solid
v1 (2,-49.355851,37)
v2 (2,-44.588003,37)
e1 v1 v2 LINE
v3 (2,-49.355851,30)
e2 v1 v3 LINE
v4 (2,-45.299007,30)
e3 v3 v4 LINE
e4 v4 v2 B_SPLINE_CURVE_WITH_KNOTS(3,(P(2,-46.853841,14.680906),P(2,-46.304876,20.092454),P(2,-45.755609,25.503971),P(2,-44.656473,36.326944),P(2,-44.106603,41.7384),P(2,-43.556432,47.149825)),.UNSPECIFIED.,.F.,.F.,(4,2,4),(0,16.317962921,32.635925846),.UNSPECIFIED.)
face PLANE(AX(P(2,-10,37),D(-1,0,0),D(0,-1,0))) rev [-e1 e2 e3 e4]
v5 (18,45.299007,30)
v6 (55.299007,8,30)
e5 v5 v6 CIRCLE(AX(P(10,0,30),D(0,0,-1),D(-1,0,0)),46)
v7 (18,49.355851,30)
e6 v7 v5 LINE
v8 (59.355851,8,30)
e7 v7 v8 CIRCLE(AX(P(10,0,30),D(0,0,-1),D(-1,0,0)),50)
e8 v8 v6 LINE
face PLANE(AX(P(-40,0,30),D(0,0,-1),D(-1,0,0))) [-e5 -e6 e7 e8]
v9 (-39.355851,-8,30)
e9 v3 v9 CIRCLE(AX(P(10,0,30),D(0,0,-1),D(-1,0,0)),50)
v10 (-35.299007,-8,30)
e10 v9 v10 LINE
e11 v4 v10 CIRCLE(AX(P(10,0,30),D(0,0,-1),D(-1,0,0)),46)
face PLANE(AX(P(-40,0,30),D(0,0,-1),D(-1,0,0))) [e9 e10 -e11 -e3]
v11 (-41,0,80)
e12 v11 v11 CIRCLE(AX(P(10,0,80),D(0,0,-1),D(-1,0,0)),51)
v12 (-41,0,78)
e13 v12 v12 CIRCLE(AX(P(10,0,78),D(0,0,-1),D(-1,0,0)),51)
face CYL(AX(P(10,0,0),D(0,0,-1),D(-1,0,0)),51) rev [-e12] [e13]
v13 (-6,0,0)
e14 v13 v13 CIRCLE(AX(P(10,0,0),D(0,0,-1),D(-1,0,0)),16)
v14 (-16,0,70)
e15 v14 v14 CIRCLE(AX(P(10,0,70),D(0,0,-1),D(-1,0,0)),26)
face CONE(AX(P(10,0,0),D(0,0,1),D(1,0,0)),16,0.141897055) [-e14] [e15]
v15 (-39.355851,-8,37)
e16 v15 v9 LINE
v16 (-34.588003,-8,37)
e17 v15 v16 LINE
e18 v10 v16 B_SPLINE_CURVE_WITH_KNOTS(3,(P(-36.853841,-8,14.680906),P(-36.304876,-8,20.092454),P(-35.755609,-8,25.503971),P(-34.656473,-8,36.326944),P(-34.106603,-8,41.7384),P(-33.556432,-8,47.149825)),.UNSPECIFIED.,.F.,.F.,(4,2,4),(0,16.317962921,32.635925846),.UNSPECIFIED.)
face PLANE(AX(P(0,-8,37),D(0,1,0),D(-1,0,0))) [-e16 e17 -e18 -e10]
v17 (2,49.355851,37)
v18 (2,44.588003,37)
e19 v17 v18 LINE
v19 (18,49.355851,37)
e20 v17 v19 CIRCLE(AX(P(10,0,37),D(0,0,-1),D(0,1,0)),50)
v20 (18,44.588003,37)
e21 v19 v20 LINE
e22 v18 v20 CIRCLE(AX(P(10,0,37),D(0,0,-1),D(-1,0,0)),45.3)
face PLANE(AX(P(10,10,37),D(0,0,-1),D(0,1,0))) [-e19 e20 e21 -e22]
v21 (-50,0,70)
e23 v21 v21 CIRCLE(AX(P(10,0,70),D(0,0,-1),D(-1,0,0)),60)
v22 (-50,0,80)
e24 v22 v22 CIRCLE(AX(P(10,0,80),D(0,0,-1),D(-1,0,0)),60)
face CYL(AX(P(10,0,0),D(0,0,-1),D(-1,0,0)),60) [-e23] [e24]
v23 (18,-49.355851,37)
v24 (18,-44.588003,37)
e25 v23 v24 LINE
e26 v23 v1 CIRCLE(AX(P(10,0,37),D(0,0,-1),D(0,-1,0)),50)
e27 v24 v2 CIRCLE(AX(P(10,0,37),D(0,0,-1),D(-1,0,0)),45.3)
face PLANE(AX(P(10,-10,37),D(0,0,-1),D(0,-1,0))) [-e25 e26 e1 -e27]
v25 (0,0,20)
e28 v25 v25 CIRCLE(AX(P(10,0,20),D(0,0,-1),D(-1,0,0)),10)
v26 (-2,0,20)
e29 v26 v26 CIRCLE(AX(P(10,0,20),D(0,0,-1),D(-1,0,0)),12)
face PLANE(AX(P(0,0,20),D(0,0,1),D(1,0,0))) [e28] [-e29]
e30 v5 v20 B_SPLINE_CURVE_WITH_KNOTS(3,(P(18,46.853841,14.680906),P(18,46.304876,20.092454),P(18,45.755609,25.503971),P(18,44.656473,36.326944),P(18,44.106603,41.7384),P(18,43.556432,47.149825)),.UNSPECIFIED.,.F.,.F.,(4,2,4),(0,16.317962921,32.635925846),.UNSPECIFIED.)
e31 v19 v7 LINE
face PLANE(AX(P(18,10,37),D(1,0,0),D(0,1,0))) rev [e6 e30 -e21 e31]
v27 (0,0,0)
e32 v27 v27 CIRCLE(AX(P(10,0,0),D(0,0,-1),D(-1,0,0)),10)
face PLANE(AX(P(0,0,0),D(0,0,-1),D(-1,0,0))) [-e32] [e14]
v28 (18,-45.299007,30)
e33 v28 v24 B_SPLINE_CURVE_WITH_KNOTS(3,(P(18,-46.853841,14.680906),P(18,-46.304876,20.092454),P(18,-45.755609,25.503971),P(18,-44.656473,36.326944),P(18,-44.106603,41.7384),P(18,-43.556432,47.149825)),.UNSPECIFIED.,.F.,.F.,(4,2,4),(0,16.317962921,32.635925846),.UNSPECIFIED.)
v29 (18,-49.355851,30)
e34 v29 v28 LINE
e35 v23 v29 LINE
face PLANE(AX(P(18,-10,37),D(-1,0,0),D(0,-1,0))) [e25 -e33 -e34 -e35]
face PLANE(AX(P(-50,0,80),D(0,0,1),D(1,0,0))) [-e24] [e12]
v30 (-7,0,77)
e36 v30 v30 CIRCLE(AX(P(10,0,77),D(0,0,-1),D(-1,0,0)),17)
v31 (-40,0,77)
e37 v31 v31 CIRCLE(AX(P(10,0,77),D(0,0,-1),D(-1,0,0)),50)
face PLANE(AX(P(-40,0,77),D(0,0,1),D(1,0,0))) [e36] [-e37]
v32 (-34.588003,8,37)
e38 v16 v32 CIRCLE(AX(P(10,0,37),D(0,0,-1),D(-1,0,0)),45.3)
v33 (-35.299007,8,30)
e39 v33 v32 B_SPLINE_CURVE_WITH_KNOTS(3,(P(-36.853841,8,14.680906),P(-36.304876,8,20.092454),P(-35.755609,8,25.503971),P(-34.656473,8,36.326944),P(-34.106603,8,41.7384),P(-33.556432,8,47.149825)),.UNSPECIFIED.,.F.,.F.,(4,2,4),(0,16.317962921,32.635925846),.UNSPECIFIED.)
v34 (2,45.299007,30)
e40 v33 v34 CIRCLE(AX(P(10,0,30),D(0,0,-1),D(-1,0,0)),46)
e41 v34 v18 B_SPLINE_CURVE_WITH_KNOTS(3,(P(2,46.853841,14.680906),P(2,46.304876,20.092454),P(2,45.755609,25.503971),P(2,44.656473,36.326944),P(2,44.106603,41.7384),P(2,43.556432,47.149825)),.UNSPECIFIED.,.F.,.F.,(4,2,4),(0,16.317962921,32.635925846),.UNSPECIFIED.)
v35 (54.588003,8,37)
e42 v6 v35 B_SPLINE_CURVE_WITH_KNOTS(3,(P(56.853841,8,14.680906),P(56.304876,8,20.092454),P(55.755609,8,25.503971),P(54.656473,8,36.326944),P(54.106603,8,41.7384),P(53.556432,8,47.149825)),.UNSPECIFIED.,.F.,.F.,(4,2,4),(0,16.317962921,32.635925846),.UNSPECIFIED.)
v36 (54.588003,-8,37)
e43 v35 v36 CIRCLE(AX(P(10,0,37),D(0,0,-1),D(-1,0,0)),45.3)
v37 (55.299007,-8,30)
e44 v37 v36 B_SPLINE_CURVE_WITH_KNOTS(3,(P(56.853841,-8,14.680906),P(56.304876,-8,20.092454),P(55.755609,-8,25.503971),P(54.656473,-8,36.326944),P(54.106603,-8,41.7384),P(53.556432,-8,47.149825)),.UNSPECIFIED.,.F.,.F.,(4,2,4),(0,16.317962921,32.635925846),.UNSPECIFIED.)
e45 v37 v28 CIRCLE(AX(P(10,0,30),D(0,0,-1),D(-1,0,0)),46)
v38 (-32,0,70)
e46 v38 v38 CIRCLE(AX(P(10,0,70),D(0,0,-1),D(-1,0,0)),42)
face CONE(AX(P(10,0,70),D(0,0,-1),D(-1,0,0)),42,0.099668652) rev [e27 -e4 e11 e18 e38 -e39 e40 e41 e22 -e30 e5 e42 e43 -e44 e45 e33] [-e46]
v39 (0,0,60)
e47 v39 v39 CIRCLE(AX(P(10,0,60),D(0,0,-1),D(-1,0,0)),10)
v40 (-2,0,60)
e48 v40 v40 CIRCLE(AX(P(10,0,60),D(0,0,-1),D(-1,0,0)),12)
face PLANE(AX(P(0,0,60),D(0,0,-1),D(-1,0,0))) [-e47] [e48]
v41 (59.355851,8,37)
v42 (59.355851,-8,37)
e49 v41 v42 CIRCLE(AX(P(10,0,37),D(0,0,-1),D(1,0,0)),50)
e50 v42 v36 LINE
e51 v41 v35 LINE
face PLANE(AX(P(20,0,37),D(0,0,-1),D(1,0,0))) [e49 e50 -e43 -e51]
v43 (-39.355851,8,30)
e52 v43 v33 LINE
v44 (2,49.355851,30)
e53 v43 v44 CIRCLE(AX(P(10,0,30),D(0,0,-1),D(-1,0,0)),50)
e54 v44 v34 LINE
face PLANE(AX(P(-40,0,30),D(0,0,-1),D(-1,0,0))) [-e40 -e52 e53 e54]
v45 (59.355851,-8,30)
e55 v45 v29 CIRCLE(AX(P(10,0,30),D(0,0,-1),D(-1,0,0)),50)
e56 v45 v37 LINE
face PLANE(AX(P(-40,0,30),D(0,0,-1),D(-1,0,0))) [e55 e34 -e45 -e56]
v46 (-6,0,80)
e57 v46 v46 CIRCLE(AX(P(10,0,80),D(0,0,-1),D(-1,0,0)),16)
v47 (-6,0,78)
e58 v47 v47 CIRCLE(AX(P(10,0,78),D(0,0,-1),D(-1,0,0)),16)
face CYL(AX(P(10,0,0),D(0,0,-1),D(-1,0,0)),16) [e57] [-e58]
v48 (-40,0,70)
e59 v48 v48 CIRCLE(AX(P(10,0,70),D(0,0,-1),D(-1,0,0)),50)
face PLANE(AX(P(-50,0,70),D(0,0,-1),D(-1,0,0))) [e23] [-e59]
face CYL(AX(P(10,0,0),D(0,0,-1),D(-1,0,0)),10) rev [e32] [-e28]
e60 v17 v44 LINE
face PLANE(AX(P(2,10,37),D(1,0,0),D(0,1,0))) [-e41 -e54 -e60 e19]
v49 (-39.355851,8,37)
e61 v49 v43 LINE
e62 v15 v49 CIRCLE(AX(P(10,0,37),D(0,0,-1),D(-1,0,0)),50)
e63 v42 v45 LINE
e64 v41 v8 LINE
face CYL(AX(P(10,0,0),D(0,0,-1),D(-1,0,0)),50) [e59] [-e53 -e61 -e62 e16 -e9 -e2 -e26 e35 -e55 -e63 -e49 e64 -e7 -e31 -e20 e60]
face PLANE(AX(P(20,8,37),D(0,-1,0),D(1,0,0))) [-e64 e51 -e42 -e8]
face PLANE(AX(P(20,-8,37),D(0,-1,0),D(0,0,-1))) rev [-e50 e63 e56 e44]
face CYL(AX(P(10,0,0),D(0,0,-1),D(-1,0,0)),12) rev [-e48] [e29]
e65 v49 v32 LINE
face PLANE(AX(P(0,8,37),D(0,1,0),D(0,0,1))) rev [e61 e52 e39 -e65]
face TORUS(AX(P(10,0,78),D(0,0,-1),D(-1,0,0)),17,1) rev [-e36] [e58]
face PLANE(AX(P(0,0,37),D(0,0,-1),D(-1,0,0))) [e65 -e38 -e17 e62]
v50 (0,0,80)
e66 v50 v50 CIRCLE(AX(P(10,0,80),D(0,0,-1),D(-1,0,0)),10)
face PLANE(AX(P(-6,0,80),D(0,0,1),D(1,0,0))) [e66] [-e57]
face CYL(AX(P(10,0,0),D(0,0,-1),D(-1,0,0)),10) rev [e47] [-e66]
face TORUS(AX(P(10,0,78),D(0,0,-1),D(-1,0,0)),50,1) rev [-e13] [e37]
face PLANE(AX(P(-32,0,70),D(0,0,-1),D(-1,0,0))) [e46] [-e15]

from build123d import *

# Parameters (mm, degrees)
CUT_EXTRUDE2_DEPTH = 7
CIRPATTERN1_COUNT  = 4


with BuildPart() as part:
    # Sketch2 → Revolve1 (revolve)
    with BuildSketch(Plane(origin=(0, 0, 0), x_dir=(1, 0, 0), z_dir=(0, 1, 0))):
        with BuildLine():
            Line((-50, -80), (-50, -70))
            Line((-50, -70), (-40, -70))
            Line((-40, -70), (-40, -30))
            Line((-40, -30), (-36, -30))
            Line((-36, -30), (-32, -70))
            Line((-32, -70), (-16, -70))
            Line((-16, -70), (-6, 0))
            Line((-6, 0), (0, 0))
            Line((0, 0), (0, -20))
            Line((0, -20), (-2, -20))
            Line((-2, -20), (-2, -60))
            Line((-2, -60), (0, -60))
            Line((0, -60), (0, -80))
            Line((0, -80), (-6, -80))
            Line((-6, -80), (-6, -78))
            ThreePointArc((-6, -78), (-6.292893219, -77.292893219), (-7, -77))
            Line((-7, -77), (-40, -77))
            ThreePointArc((-40, -77), (-40.707106781, -77.292893219), (-41, -78))
            Line((-41, -78), (-41, -80))
            Line((-41, -80), (-50, -80))
        make_face()
    revolve(axis=Axis((10, 0, 0), (0, 0, 1)))

    # Sketch3 → Cut-Extrude2 (cut)
    with BuildSketch(Plane(origin=(0, 0, 30), x_dir=(-1, 0, 0), z_dir=(0, 0, -1))):
        with BuildLine():
            ThreePointArc((39.355850717, -8), (40, 0), (39.355850717, 8))
            Line((39.355850717, 8), (31.231056256, 8))
            ThreePointArc((31.231056256, 8), (32, 0), (31.231056256, -8))
            Line((31.231056256, -8), (39.355850717, -8))
        make_face()
    cut_extrude2 = extrude(amount=-CUT_EXTRUDE2_DEPTH, mode=Mode.SUBTRACT)

    # CirPattern1: Cut-Extrude2 ×4 about axis
    cirpattern1_axis = Axis((10, 0, 30), (0, 0, -1))
    for i in range(1, CIRPATTERN1_COUNT):
        add(cut_extrude2.rotate(cirpattern1_axis, i * 360 / CIRPATTERN1_COUNT), mode=Mode.SUBTRACT)


solid = part.part
